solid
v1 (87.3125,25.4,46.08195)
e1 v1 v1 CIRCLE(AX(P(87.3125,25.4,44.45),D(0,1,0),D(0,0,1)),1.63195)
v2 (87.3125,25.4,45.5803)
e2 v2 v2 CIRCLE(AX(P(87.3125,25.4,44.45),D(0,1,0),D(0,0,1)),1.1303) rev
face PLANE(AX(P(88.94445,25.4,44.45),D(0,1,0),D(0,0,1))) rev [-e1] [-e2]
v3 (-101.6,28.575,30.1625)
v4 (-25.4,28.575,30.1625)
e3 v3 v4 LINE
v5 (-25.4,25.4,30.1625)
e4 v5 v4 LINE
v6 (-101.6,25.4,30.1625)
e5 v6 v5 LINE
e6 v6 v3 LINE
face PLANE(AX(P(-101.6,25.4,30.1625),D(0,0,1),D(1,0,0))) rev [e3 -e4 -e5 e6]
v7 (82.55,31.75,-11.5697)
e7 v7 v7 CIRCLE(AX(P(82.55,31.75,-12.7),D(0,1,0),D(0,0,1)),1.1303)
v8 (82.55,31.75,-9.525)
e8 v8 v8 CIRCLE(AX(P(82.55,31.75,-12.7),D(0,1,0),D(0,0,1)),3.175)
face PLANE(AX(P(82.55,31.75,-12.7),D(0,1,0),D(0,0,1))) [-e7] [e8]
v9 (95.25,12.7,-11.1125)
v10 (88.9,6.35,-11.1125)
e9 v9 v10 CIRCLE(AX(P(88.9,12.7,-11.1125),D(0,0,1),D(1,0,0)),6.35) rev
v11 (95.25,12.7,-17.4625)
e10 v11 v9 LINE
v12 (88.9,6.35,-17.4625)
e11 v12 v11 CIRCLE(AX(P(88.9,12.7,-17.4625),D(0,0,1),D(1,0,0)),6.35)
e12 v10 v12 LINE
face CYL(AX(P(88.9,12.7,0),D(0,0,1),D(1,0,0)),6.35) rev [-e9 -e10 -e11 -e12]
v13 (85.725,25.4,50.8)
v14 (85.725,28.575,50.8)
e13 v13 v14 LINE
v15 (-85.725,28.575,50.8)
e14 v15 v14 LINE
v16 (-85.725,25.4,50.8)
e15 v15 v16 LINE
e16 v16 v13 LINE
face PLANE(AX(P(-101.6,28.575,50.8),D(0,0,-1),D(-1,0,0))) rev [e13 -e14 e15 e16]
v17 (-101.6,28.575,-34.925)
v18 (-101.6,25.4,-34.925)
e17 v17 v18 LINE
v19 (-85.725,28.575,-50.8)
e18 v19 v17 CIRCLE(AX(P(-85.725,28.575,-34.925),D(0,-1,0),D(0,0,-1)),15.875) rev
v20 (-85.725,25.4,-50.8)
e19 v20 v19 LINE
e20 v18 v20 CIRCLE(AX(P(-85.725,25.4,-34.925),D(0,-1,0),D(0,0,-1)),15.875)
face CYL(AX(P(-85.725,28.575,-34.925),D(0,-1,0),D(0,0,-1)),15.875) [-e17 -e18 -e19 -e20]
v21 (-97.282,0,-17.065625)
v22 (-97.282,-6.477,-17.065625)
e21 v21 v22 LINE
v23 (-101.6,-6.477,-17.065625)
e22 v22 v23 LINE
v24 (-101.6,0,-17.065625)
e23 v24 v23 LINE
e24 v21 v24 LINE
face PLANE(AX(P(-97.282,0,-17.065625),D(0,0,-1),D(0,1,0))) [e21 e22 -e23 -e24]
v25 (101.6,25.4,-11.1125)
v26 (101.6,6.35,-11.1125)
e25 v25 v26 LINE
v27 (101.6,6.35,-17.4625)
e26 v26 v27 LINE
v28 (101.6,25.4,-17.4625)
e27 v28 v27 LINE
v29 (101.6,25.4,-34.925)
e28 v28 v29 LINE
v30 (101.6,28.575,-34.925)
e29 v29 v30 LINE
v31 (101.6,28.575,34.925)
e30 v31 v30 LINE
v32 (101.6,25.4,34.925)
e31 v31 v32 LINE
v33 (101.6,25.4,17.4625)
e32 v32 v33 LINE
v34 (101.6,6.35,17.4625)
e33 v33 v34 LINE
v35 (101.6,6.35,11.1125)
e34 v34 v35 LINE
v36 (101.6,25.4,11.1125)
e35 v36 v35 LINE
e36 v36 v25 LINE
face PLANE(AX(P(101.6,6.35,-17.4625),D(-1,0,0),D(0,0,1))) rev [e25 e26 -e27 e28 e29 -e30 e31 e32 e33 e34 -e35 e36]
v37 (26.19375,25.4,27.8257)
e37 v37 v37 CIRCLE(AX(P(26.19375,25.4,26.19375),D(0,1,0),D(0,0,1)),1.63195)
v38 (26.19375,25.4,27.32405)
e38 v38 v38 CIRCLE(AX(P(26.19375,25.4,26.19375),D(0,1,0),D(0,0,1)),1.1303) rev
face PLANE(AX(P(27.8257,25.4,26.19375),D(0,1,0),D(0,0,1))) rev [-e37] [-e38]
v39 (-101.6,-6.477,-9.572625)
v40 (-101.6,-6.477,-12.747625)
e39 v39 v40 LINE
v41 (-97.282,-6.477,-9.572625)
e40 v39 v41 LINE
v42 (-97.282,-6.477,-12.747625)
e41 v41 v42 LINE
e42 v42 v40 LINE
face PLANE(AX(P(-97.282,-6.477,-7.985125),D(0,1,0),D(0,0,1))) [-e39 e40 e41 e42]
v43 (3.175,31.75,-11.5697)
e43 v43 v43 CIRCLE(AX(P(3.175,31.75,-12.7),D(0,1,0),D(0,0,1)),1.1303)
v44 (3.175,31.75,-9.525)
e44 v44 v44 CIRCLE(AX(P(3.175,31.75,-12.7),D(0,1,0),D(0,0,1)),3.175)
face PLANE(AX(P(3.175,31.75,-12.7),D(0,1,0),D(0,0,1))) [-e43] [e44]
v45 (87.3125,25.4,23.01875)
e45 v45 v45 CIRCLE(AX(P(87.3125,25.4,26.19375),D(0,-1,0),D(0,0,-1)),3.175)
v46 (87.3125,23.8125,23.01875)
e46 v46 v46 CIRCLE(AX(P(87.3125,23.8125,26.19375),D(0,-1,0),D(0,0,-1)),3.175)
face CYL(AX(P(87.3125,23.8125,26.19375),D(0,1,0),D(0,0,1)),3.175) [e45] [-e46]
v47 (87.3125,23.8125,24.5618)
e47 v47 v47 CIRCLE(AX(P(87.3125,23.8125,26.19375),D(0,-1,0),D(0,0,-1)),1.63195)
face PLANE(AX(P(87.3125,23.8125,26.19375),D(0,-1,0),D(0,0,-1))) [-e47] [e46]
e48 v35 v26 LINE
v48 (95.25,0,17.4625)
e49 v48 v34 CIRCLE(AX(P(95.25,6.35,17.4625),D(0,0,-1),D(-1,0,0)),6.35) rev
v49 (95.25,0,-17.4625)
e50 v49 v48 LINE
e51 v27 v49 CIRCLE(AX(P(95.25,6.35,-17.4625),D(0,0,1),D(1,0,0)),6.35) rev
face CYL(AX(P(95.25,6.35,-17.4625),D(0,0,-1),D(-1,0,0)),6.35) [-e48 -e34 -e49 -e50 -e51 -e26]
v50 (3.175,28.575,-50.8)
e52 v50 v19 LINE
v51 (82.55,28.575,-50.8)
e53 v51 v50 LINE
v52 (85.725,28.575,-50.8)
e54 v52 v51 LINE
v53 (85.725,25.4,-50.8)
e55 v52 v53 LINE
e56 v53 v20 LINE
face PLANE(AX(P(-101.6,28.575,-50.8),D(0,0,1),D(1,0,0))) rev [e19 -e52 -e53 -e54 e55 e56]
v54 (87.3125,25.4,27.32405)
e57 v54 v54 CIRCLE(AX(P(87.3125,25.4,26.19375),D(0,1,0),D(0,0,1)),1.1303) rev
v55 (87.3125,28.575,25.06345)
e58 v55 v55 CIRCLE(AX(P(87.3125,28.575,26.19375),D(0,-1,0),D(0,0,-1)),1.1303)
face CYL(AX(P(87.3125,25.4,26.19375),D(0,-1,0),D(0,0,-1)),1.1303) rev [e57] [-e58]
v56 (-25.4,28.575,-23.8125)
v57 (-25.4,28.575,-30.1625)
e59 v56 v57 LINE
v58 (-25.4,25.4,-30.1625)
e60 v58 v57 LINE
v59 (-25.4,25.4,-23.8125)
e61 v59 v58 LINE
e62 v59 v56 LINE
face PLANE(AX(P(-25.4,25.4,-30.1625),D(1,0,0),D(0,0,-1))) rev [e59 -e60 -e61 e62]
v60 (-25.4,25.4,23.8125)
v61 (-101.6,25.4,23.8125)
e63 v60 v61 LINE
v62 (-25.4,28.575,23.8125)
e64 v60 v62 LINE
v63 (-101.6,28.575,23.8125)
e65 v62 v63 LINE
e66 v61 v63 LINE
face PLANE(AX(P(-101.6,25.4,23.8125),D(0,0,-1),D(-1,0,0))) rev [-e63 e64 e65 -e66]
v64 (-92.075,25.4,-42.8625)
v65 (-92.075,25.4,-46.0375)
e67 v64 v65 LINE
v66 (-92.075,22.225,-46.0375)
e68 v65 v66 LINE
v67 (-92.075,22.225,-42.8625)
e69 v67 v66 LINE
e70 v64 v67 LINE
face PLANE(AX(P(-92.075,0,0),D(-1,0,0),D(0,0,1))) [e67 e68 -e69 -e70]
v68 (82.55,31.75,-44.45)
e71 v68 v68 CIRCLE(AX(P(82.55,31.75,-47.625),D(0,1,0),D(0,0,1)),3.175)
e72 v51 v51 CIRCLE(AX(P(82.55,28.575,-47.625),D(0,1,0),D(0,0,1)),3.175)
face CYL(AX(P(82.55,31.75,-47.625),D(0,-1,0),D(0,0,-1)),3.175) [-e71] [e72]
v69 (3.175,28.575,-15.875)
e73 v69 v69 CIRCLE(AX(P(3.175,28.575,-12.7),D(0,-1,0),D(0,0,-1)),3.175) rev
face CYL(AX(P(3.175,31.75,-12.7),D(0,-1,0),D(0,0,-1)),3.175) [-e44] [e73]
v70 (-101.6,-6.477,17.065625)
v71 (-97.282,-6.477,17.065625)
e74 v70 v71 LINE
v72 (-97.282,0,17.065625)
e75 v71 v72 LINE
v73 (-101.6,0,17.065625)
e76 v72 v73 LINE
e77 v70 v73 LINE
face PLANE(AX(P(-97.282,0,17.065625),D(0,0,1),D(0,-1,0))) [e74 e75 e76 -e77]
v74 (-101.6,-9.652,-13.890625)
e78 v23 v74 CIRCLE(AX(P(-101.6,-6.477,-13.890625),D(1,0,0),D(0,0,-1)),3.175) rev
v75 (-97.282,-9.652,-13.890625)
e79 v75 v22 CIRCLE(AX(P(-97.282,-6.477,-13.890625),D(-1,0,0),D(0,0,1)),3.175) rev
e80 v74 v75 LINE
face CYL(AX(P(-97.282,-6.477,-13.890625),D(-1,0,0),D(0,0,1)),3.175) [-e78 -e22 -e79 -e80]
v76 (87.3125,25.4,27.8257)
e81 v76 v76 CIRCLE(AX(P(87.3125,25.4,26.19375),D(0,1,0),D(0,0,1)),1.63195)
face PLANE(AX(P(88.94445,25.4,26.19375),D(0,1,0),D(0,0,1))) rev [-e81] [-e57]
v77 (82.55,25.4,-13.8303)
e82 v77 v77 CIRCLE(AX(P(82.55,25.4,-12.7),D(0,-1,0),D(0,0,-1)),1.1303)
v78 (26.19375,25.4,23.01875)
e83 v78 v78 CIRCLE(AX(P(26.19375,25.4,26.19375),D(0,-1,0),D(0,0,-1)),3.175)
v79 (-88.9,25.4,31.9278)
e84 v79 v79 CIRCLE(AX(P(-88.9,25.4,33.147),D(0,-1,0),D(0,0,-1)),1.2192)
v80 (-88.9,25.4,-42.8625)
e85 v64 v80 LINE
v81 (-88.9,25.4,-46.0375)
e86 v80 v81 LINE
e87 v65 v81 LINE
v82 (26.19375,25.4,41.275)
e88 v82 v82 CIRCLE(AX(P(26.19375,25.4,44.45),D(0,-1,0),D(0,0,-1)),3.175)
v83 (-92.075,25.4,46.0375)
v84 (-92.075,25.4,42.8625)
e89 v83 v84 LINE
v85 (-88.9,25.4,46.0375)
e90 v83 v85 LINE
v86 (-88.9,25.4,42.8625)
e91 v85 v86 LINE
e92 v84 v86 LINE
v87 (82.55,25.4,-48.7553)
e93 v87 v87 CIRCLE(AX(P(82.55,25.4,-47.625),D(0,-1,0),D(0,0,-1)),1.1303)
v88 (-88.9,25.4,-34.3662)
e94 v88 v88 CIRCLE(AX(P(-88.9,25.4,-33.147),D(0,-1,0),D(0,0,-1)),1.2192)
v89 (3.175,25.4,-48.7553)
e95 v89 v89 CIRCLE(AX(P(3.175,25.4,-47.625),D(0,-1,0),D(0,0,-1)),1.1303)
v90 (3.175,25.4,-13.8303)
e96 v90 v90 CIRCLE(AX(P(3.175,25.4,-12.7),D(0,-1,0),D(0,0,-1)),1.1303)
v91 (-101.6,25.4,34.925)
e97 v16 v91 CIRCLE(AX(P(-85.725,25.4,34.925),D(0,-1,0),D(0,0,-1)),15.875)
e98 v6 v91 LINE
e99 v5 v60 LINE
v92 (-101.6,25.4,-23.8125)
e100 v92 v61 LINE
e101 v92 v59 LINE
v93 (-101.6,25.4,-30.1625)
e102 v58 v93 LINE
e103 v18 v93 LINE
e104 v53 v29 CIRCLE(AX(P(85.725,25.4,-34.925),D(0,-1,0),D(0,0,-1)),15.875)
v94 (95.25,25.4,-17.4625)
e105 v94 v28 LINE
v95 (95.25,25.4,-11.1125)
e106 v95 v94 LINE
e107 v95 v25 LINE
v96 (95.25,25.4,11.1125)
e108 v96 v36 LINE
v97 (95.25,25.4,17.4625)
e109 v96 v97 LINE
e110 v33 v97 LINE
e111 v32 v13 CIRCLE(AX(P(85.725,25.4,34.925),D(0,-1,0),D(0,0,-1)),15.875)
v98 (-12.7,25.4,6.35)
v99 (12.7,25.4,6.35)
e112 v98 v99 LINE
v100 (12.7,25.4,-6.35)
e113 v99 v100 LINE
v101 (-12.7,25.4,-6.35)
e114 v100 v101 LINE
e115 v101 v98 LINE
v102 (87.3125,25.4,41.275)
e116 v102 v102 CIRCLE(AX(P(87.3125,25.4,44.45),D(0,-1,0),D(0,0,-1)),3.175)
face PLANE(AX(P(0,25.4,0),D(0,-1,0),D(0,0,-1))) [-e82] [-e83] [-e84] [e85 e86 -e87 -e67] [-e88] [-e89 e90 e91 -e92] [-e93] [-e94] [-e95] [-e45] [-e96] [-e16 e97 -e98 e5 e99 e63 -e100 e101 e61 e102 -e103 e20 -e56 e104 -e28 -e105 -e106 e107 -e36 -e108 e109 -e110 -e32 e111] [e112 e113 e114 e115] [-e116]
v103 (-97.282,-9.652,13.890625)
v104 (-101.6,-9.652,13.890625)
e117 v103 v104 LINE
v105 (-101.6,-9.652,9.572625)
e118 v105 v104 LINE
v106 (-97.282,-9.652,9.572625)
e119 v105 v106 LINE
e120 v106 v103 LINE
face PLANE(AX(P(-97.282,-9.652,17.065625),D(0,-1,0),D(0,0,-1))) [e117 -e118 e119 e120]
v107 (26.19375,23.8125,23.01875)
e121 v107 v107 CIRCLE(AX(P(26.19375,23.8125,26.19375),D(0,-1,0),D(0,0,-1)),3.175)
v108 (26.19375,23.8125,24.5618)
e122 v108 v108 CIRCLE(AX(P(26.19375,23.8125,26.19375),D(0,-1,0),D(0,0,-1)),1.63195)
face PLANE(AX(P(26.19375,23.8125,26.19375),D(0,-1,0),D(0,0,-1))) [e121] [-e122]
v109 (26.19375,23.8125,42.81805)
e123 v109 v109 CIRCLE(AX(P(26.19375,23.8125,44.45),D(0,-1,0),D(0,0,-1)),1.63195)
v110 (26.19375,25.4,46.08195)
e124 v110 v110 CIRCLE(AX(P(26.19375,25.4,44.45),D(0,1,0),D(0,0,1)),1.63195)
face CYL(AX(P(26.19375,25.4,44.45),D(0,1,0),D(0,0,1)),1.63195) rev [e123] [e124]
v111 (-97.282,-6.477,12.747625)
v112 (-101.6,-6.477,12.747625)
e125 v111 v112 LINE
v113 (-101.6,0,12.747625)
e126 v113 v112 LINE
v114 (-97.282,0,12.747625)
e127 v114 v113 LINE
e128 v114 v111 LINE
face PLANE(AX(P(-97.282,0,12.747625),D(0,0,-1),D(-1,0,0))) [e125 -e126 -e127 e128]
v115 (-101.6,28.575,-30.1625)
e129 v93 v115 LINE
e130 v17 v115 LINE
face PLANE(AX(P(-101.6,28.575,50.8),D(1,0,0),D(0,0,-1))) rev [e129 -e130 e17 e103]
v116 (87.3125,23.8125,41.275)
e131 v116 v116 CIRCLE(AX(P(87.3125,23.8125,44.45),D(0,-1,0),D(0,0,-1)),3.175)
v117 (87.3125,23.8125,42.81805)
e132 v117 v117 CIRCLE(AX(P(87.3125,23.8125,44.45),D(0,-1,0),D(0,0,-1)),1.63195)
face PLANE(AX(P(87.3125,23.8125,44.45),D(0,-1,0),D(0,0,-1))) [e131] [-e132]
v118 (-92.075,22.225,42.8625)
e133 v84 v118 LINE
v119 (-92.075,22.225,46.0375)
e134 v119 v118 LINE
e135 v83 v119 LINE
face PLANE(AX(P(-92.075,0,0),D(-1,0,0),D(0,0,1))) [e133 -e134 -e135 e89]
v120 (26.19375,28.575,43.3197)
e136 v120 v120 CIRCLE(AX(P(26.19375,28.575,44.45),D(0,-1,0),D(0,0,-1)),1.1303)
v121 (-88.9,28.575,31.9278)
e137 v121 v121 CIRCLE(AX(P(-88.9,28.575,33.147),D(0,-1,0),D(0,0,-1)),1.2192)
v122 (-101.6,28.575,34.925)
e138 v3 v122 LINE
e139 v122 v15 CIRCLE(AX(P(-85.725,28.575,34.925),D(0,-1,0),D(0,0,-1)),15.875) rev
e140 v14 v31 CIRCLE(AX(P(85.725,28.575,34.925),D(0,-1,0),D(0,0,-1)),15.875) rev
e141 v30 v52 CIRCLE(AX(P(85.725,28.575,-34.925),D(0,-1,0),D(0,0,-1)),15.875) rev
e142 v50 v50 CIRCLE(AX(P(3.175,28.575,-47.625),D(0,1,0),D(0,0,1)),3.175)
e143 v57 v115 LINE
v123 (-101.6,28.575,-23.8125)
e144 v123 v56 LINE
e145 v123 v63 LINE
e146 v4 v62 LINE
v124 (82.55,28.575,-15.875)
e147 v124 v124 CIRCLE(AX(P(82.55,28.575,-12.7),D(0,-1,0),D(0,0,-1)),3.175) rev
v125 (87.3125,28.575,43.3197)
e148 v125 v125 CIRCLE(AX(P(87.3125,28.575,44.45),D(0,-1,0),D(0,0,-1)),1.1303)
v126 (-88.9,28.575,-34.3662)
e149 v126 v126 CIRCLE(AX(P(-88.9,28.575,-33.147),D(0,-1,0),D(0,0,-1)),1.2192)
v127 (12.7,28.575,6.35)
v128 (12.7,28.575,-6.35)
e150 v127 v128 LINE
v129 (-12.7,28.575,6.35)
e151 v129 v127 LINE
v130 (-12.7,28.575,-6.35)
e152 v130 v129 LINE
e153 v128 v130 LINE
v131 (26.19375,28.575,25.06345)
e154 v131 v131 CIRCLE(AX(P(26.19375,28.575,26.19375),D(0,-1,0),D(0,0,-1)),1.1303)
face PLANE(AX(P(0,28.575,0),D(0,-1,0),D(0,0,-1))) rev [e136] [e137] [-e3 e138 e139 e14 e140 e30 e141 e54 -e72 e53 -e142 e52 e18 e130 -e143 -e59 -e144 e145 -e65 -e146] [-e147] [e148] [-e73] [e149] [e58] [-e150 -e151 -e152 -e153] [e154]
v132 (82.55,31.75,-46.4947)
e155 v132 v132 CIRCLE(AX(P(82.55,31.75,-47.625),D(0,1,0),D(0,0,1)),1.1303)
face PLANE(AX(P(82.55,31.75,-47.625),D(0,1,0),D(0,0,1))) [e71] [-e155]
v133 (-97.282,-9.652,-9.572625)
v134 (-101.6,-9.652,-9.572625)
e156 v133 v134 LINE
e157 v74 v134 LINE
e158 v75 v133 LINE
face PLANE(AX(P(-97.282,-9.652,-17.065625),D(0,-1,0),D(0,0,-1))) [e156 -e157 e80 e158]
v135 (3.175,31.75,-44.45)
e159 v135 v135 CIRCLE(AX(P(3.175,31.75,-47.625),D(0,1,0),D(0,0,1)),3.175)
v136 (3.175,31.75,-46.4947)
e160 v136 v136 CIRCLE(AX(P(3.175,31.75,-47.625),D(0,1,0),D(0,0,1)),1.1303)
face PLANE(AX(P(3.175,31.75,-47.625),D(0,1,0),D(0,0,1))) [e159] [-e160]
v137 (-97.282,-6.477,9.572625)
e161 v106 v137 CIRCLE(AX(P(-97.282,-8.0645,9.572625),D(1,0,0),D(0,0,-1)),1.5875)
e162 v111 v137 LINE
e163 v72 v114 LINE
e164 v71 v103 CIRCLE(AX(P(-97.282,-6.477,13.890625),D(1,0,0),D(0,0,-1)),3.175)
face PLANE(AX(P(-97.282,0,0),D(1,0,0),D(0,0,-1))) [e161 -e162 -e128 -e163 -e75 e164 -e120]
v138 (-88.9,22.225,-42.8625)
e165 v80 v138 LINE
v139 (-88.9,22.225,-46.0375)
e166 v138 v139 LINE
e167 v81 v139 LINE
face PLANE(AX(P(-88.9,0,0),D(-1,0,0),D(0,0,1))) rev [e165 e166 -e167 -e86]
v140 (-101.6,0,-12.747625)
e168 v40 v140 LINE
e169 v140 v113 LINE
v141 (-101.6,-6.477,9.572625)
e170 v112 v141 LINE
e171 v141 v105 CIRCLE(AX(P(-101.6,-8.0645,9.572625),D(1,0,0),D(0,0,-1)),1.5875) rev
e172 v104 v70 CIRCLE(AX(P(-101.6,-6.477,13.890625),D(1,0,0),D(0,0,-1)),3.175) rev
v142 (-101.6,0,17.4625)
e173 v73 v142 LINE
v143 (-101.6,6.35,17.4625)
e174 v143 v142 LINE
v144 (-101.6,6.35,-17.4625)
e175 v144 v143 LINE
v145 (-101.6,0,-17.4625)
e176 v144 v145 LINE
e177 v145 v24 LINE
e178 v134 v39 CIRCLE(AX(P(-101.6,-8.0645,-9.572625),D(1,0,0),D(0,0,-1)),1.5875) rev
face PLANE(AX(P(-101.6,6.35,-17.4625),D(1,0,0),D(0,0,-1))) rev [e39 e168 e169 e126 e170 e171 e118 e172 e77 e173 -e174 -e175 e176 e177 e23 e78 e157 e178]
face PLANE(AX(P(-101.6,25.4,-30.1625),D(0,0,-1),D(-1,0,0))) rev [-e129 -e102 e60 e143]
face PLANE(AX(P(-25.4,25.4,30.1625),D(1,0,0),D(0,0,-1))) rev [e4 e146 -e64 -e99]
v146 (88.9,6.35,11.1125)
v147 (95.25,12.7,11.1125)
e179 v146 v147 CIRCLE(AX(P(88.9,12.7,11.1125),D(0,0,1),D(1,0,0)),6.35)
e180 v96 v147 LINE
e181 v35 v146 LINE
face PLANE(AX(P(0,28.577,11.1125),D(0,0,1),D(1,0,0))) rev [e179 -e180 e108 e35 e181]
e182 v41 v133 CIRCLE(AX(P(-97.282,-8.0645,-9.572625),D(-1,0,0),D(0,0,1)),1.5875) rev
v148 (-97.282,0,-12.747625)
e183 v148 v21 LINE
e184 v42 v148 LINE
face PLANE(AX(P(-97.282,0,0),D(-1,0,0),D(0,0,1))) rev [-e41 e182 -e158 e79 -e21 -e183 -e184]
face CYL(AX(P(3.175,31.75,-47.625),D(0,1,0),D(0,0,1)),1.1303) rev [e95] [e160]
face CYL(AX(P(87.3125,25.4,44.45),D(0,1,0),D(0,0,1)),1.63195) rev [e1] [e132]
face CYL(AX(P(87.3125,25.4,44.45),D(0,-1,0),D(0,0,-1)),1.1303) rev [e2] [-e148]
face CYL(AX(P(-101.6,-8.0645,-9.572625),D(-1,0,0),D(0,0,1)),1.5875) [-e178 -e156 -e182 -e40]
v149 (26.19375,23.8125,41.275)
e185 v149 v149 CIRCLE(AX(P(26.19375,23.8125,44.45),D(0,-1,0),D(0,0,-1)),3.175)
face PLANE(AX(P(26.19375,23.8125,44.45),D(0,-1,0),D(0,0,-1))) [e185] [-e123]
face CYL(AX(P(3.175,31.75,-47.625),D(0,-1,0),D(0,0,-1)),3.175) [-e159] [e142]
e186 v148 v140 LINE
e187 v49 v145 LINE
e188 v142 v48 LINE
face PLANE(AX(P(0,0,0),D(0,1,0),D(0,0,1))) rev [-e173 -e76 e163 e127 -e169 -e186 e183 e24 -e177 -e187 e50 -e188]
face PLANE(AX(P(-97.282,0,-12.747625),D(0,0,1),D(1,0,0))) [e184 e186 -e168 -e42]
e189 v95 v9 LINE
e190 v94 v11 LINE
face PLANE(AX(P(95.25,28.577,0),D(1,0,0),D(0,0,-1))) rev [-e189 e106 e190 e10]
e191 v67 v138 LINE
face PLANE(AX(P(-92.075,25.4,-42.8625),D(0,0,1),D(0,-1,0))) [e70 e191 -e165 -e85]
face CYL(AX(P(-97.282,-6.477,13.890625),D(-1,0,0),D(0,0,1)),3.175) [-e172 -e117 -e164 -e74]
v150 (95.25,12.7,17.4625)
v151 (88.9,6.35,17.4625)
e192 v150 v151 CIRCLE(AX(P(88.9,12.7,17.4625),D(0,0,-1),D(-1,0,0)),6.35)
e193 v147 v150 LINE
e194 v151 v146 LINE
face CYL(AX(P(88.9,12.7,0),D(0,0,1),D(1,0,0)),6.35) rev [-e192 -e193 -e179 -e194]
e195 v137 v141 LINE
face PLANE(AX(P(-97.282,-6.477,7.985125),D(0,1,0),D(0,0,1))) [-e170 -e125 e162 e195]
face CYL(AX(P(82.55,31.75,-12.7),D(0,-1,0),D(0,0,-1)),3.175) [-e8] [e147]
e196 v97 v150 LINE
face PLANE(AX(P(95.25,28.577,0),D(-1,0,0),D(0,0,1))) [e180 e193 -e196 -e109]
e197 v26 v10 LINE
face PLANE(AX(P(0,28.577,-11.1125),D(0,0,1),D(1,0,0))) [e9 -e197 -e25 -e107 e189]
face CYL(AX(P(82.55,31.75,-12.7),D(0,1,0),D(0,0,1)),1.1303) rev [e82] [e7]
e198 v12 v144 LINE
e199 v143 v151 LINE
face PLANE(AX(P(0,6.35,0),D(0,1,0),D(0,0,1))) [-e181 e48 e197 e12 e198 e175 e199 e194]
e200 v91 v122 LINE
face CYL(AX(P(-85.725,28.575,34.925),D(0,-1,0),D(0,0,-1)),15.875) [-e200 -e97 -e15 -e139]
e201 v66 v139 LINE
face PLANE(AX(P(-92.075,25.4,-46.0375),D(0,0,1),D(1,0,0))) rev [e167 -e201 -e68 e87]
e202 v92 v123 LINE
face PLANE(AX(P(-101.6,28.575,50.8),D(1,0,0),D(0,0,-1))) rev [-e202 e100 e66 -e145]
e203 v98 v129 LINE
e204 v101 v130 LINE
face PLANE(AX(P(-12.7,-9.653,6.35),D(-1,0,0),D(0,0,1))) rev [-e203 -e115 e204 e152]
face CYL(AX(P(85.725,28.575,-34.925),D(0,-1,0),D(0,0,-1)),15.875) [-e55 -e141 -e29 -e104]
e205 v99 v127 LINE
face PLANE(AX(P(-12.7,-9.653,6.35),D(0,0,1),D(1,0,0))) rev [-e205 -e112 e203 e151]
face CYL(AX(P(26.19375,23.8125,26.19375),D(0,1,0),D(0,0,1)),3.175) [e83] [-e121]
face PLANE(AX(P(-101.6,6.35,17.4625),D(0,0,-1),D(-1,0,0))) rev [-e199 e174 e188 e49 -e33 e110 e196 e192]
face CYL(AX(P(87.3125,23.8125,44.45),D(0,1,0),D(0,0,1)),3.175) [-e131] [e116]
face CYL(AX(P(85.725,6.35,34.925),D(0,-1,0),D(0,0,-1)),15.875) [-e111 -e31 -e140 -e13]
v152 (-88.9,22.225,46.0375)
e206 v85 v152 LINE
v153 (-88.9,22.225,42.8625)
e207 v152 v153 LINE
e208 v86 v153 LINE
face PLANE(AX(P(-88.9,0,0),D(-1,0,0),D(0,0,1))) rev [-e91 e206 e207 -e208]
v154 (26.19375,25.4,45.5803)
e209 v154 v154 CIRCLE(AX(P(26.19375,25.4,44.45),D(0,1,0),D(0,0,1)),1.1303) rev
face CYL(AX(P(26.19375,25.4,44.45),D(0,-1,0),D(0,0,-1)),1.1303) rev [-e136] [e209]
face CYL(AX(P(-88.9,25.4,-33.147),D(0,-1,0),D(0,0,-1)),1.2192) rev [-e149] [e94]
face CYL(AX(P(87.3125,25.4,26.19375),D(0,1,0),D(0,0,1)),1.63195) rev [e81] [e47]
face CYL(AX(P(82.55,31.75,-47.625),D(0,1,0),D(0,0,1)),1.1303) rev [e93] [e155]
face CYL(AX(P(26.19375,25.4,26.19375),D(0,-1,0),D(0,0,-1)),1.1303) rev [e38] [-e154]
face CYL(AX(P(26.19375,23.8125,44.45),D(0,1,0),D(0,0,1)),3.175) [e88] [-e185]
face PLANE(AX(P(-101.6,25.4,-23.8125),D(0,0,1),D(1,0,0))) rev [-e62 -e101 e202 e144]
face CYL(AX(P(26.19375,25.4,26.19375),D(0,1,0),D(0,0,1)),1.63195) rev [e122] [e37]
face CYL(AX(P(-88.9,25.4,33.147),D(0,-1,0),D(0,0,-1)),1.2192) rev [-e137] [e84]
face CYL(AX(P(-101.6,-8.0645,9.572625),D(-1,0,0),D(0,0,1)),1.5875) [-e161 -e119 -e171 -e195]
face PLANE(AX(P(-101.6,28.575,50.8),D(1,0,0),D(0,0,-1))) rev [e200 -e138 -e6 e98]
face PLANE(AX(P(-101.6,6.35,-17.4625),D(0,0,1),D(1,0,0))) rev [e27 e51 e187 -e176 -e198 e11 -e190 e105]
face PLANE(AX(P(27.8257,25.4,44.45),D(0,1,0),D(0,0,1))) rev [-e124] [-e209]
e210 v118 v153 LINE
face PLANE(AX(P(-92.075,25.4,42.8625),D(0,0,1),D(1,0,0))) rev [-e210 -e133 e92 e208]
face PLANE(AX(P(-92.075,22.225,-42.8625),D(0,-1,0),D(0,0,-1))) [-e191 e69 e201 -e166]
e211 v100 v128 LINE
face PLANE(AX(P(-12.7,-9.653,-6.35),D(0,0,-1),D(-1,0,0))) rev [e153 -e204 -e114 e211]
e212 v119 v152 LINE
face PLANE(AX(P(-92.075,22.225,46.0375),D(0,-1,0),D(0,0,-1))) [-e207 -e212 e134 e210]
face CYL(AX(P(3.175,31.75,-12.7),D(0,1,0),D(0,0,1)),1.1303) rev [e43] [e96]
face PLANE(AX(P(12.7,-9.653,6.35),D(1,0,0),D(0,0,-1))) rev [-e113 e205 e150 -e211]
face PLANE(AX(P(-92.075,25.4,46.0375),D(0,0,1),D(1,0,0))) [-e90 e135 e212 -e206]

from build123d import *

# Parameters (mm, degrees)
SKETCH1_W                      = 203.2
SKETCH1_H                      = 34.925
BOSS_EXTRUDE1_DEPTH            = 6.35
BOSS_EXTRUDE3_START            = 19.05
SKETCH2_W                      = 203.2
SKETCH2_H                      = 101.6
BOSS_EXTRUDE3_DEPTH            = 3.175
BOSS_EXTRUDE4_REACH            = 117.746
SKETCH3_W                      = 6.35
SKETCH3_H                      = 6.35
SKETCH4_W                      = 76.2
SKETCH4_H                      = 6.35
CUT_EXTRUDE1_DEPTH             = 3.175
BOSS_EXTRUDE5_START            = -190.5
SKETCH5_W                      = 3.175
SKETCH5_H                      = 3.175
BOSS_EXTRUDE5_DEPTH            = 3.175
F_2_CLEARANCE_HOLE1_D          = 2.4384
FILLET1_R                      = 15.875
FILLET2_R                      = 6.35
F_4_40_TAPPED_HOLE2_D          = 2.2606
SKETCH15_R                     = 3.175
BOSS_EXTRUDE6_DEPTH            = 1.5875
SKETCH20_W                     = 1.63195
SKETCH20_H                     = 25.4
F_4_CLEARANCE_HOLE3_AT_2_COUNT = 2
F_4_CLEARANCE_HOLE3_AT_2_PITCH = 18.25625
F_4_CLEARANCE_HOLE3_AT_3_COUNT = 2
F_4_CLEARANCE_HOLE3_AT_3_PITCH = 63.787085414
F_4_CLEARANCE_HOLE3_AT_4_COUNT = 2
F_4_CLEARANCE_HOLE3_AT_4_PITCH = 61.11875
BOSS_EXTRUDE11_DEPTH           = 4.318
FILLET10_RADIUS                = 1.5875
FILLET10_LENGTH                = 4.318
FILLET11_RADIUS                = 1.5875
FILLET11_LENGTH                = 4.318
FILLET12_R                     = 3.175
FILLET14_R                     = 15.875
SKETCH23_R                     = 3.175
BOSS_EXTRUDE12_DEPTH           = 3.175
CUT_EXTRUDE2_REACH             = 121.852
SKETCH26_W                     = 25.4
SKETCH26_H                     = 12.7
F_4_40_TAPPED_HOLE3_D          = 2.2606
F_4_40_TAPPED_HOLE3_DEPTH      = 6.35


with BuildPart() as part:
    # Sketch1 → Boss-Extrude1 (new body)
    with BuildSketch(Plane(origin=(0, 0, 0), x_dir=(1, 0, 0), z_dir=(0, 1, 0))):
        Rectangle(SKETCH1_W, SKETCH1_H)
    extrude(amount=BOSS_EXTRUDE1_DEPTH)


with BuildPart() as body_2:
    # Sketch2 → Boss-Extrude3 (new body)
    with BuildSketch(Plane(origin=(0, 6.35, 0), x_dir=(1, 0, 0), z_dir=(0, 1, 0)).offset(BOSS_EXTRUDE3_START)):
        Rectangle(SKETCH2_W, SKETCH2_H)
    extrude(amount=BOSS_EXTRUDE3_DEPTH)

    # Sketch3 → Boss-Extrude4 (add, up to next)
    with BuildSketch(Plane(origin=(0, 6.35, 0), x_dir=(1, 0, 0), z_dir=(0, 1, 0)), mode=Mode.PRIVATE) as boss_extrude4_sk1:
        with Locations((98.425, -14.2875)):
            Rectangle(SKETCH3_W, SKETCH3_H)
    boss_extrude4_tool1 = extrude(boss_extrude4_sk1.sketch, amount=BOSS_EXTRUDE4_REACH, mode=Mode.PRIVATE) - body_2.part
    # Sketch3 → Boss-Extrude4 (add, up to next)
    with BuildSketch(Plane(origin=(0, 6.35, 0), x_dir=(1, 0, 0), z_dir=(0, 1, 0)), mode=Mode.PRIVATE) as boss_extrude4_sk2:
        with Locations((98.425, 14.2875)):
            Rectangle(SKETCH3_W, SKETCH3_H)
    boss_extrude4_tool2 = extrude(boss_extrude4_sk2.sketch, amount=BOSS_EXTRUDE4_REACH, mode=Mode.PRIVATE) - body_2.part

    add(part.part)  # Boss-Extrude4 merges part
    add(boss_extrude4_tool1.solids().sort_by_distance((98.425, 6.35, 14.2875))[0])
    add(boss_extrude4_tool2.solids().sort_by_distance((98.425, 6.35, -14.2875))[0])

    # Sketch4 → Cut-Extrude1 (cut)
    with BuildSketch(Plane(origin=(0, 28.575, 0), x_dir=(1, 0, 0), z_dir=(0, 1, 0))):
        with Locations((-63.5, -26.9875)):
            Rectangle(SKETCH4_W, SKETCH4_H)
        with Locations((-63.5, 26.9875)):
            Rectangle(SKETCH4_W, SKETCH4_H)
    extrude(amount=-CUT_EXTRUDE1_DEPTH, mode=Mode.SUBTRACT)

    # Sketch5 → Boss-Extrude5 (add)
    with BuildSketch(Plane(origin=(101.6, 0, 0), x_dir=(0, 0, -1), z_dir=(1, 0, 0)).offset(BOSS_EXTRUDE5_START)):
        with Locations((-44.45, 23.8125)):
            Rectangle(SKETCH5_W, SKETCH5_H)
        with Locations((44.45, 23.8125)):
            Rectangle(SKETCH5_W, SKETCH5_H)
    extrude(amount=-BOSS_EXTRUDE5_DEPTH)

    # #2 Clearance Hole1 (through all)
    with Locations(Plane(origin=(0, 25.4, 0), x_dir=(-1, 0, 0), z_dir=(0, -1, 0))):
        with Locations((88.9, 33.147), (88.9, -33.147)):
            Hole(F_2_CLEARANCE_HOLE1_D / 2)

    # Fillet1
    fillet1_edges = [body_2.edges().sort_by_distance(p)[0] for p in [
        (101.6, 26.9875, 50.8),
        (101.6, 26.9875, -50.8),
    ]]
    fillet(fillet1_edges, radius=FILLET1_R)

    # Fillet2
    fillet2_edges = [body_2.edges().sort_by_distance(p)[0] for p in [
        (95.25, 6.35, 14.2875),
        (95.25, 6.35, -14.2875),
        (101.6, 0, 0),
    ]]
    fillet(fillet2_edges, radius=FILLET2_R - 0.0001)  # a hair under: the kernel refuses the full size

    # #4-40 Tapped Hole2 (through all)
    with Locations(Plane(origin=(0, 25.4, 0), x_dir=(-1, 0, 0), z_dir=(0, -1, 0))):
        with Locations((-87.3125, -44.45), (-87.3125, -26.19375), (-26.19375, -26.19375), (-26.19375, -44.45)):
            Hole(F_4_40_TAPPED_HOLE2_D / 2)

    # Sketch15 → Boss-Extrude6 (add)
    with BuildSketch(Plane.XZ.offset(-25.4)):
        with Locations(Location((26.19375, 44.45, 0), (0, 0, 270))):
            Circle(SKETCH15_R)
        with Locations(Location((87.3125, 44.45, 0), (0, 0, 270))):
            Circle(SKETCH15_R)
        with Locations(Location((87.3125, 26.19375, 0), (0, 0, 270))):
            Circle(SKETCH15_R)
        with Locations(Location((26.19375, 26.19375, 0), (0, 0, 270))):
            Circle(SKETCH15_R)
    extrude(amount=BOSS_EXTRUDE6_DEPTH)

    # Sketch20 → #4 Clearance Hole3 (revolve, cut)
    with BuildSketch(Plane(origin=(87.3125, 25.4, 44.45), x_dir=(0, 0, 1), z_dir=(1, 0, 0))):
        with Locations((0.815975, 12.7)):
            Rectangle(SKETCH20_W, SKETCH20_H)
    f_4_clearance_hole3 = revolve(axis=Axis((87.3125, 31.75, 44.45), (0, -1, 0)), mode=Mode.SUBTRACT)

    # #4 Clearance Hole3 at 2: #4 Clearance Hole3 ×2
    with Locations(*[(0, 0, -i * F_4_CLEARANCE_HOLE3_AT_2_PITCH) for i in range(1, F_4_CLEARANCE_HOLE3_AT_2_COUNT)]):
        add(f_4_clearance_hole3, mode=Mode.SUBTRACT)

    # #4 Clearance Hole3 at 3: #4 Clearance Hole3 ×2
    with Locations(*[Vector(-0.9581680931685116, 0, -0.28620605380358144) * (i * F_4_CLEARANCE_HOLE3_AT_3_PITCH) for i in range(1, F_4_CLEARANCE_HOLE3_AT_3_COUNT)]):
        add(f_4_clearance_hole3, mode=Mode.SUBTRACT)

    # #4 Clearance Hole3 at 4: #4 Clearance Hole3 ×2
    with Locations(*[(-i * F_4_CLEARANCE_HOLE3_AT_4_PITCH, 0, 0) for i in range(1, F_4_CLEARANCE_HOLE3_AT_4_COUNT)]):
        add(f_4_clearance_hole3, mode=Mode.SUBTRACT)

    # Sketch22 → Boss-Extrude11 (add)
    with BuildSketch(Plane.ZY.offset(101.6)):
        Polygon((17.065625, 0), (12.747625, 0), (12.747625, -6.477), (7.985125, -6.477), (7.985125, -9.652), (17.065625, -9.652), align=None)
        Polygon((-7.985125, -6.477), (-12.747625, -6.477), (-12.747625, 0), (-17.065625, 0), (-17.065625, -9.652), (-7.985125, -9.652), align=None)
    extrude(amount=-BOSS_EXTRUDE11_DEPTH)

    # Fillet10: full round fillet: the end face becomes a half cylinder, R = half its width
    fillet10_face = Plane((-99.441, -8.0645, 7.985125), x_dir=(-1, 0, 0), z_dir=(0, 0, -1))  # on the end face: x along it, z out of the body
    fillet10_slab = fillet10_face.offset(-FILLET10_RADIUS / 2) * Box(FILLET10_LENGTH, 2 * FILLET10_RADIUS, FILLET10_RADIUS, mode=Mode.PRIVATE)  # the body's end, R deep
    fillet10_round = Plane((-99.441, -8.0645, 9.572625), x_dir=(0, 0, -1), z_dir=(-1, 0, 0)) * Cylinder(FILLET10_RADIUS, FILLET10_LENGTH, mode=Mode.PRIVATE)  # its axis R under the face
    add(fillet10_slab - fillet10_round, mode=Mode.SUBTRACT)

    # Fillet11: full round fillet: the end face becomes a half cylinder, R = half its width
    fillet11_face = Plane((-99.441, -8.0645, -7.985125), x_dir=(-1, 0, 0), z_dir=(0, 0, 1))  # on the end face: x along it, z out of the body
    fillet11_slab = fillet11_face.offset(-FILLET11_RADIUS / 2) * Box(FILLET11_LENGTH, 2 * FILLET11_RADIUS, FILLET11_RADIUS, mode=Mode.PRIVATE)  # the body's end, R deep
    fillet11_round = Plane((-99.441, -8.0645, -9.572625), x_dir=(0, 0, 1), z_dir=(-1, 0, 0)) * Cylinder(FILLET11_RADIUS, FILLET11_LENGTH, mode=Mode.PRIVATE)  # its axis R under the face
    add(fillet11_slab - fillet11_round, mode=Mode.SUBTRACT)

    # Fillet12
    fillet12_edges = [body_2.edges().sort_by_distance(p)[0] for p in [
        (-99.441, -9.652, 17.065625),
        (-99.441, -9.652, -17.065625),
    ]]
    fillet(fillet12_edges, radius=FILLET12_R)

    # Fillet14
    fillet14_edges = [body_2.edges().sort_by_distance(p)[0] for p in [
        (-101.6, 26.9875, -50.8),
        (-101.6, 26.9875, 50.8),
    ]]
    fillet(fillet14_edges, radius=FILLET14_R)

    # Sketch23 → Boss-Extrude12 (add)
    with BuildSketch(Plane(origin=(0, 28.575, 0), x_dir=(1, 0, 0), z_dir=(0, 1, 0))):
        with Locations(Location((3.175, 12.7, 0), (0, 0, 90))):
            Circle(SKETCH23_R)
        with Locations(Location((3.175, 47.625, 0), (0, 0, 90))):
            Circle(SKETCH23_R)
        with Locations(Location((82.55, 12.7, 0), (0, 0, 90))):
            Circle(SKETCH23_R)
        with Locations(Location((82.55, 47.625, 0), (0, 0, 90))):
            Circle(SKETCH23_R)
    extrude(amount=BOSS_EXTRUDE12_DEPTH)

    # Sketch26 → Cut-Extrude2 (cut, up to next)
    with BuildSketch(Plane(origin=(0, 28.575, 0), x_dir=(1, 0, 0), z_dir=(0, 1, 0)), mode=Mode.PRIVATE) as cut_extrude2_sk1:
        Rectangle(SKETCH26_W, SKETCH26_H)
    cut_extrude2_tool1 = extrude(cut_extrude2_sk1.sketch, amount=-CUT_EXTRUDE2_REACH, mode=Mode.PRIVATE) & body_2.part
    add(cut_extrude2_tool1.solids().sort_by_distance((0, 28.575, 0))[0], mode=Mode.SUBTRACT)

    # #4-40 Tapped Hole3
    with Locations(Plane(origin=(0, 31.75, 0), x_dir=(1, 0, 0), z_dir=(0, 1, 0))):
        with Locations((3.175, 47.625), (3.175, 12.7), (82.55, 12.7), (82.55, 47.625)):
            Hole(F_4_40_TAPPED_HOLE3_D / 2, depth=F_4_40_TAPPED_HOLE3_DEPTH)


solid = body_2.part
